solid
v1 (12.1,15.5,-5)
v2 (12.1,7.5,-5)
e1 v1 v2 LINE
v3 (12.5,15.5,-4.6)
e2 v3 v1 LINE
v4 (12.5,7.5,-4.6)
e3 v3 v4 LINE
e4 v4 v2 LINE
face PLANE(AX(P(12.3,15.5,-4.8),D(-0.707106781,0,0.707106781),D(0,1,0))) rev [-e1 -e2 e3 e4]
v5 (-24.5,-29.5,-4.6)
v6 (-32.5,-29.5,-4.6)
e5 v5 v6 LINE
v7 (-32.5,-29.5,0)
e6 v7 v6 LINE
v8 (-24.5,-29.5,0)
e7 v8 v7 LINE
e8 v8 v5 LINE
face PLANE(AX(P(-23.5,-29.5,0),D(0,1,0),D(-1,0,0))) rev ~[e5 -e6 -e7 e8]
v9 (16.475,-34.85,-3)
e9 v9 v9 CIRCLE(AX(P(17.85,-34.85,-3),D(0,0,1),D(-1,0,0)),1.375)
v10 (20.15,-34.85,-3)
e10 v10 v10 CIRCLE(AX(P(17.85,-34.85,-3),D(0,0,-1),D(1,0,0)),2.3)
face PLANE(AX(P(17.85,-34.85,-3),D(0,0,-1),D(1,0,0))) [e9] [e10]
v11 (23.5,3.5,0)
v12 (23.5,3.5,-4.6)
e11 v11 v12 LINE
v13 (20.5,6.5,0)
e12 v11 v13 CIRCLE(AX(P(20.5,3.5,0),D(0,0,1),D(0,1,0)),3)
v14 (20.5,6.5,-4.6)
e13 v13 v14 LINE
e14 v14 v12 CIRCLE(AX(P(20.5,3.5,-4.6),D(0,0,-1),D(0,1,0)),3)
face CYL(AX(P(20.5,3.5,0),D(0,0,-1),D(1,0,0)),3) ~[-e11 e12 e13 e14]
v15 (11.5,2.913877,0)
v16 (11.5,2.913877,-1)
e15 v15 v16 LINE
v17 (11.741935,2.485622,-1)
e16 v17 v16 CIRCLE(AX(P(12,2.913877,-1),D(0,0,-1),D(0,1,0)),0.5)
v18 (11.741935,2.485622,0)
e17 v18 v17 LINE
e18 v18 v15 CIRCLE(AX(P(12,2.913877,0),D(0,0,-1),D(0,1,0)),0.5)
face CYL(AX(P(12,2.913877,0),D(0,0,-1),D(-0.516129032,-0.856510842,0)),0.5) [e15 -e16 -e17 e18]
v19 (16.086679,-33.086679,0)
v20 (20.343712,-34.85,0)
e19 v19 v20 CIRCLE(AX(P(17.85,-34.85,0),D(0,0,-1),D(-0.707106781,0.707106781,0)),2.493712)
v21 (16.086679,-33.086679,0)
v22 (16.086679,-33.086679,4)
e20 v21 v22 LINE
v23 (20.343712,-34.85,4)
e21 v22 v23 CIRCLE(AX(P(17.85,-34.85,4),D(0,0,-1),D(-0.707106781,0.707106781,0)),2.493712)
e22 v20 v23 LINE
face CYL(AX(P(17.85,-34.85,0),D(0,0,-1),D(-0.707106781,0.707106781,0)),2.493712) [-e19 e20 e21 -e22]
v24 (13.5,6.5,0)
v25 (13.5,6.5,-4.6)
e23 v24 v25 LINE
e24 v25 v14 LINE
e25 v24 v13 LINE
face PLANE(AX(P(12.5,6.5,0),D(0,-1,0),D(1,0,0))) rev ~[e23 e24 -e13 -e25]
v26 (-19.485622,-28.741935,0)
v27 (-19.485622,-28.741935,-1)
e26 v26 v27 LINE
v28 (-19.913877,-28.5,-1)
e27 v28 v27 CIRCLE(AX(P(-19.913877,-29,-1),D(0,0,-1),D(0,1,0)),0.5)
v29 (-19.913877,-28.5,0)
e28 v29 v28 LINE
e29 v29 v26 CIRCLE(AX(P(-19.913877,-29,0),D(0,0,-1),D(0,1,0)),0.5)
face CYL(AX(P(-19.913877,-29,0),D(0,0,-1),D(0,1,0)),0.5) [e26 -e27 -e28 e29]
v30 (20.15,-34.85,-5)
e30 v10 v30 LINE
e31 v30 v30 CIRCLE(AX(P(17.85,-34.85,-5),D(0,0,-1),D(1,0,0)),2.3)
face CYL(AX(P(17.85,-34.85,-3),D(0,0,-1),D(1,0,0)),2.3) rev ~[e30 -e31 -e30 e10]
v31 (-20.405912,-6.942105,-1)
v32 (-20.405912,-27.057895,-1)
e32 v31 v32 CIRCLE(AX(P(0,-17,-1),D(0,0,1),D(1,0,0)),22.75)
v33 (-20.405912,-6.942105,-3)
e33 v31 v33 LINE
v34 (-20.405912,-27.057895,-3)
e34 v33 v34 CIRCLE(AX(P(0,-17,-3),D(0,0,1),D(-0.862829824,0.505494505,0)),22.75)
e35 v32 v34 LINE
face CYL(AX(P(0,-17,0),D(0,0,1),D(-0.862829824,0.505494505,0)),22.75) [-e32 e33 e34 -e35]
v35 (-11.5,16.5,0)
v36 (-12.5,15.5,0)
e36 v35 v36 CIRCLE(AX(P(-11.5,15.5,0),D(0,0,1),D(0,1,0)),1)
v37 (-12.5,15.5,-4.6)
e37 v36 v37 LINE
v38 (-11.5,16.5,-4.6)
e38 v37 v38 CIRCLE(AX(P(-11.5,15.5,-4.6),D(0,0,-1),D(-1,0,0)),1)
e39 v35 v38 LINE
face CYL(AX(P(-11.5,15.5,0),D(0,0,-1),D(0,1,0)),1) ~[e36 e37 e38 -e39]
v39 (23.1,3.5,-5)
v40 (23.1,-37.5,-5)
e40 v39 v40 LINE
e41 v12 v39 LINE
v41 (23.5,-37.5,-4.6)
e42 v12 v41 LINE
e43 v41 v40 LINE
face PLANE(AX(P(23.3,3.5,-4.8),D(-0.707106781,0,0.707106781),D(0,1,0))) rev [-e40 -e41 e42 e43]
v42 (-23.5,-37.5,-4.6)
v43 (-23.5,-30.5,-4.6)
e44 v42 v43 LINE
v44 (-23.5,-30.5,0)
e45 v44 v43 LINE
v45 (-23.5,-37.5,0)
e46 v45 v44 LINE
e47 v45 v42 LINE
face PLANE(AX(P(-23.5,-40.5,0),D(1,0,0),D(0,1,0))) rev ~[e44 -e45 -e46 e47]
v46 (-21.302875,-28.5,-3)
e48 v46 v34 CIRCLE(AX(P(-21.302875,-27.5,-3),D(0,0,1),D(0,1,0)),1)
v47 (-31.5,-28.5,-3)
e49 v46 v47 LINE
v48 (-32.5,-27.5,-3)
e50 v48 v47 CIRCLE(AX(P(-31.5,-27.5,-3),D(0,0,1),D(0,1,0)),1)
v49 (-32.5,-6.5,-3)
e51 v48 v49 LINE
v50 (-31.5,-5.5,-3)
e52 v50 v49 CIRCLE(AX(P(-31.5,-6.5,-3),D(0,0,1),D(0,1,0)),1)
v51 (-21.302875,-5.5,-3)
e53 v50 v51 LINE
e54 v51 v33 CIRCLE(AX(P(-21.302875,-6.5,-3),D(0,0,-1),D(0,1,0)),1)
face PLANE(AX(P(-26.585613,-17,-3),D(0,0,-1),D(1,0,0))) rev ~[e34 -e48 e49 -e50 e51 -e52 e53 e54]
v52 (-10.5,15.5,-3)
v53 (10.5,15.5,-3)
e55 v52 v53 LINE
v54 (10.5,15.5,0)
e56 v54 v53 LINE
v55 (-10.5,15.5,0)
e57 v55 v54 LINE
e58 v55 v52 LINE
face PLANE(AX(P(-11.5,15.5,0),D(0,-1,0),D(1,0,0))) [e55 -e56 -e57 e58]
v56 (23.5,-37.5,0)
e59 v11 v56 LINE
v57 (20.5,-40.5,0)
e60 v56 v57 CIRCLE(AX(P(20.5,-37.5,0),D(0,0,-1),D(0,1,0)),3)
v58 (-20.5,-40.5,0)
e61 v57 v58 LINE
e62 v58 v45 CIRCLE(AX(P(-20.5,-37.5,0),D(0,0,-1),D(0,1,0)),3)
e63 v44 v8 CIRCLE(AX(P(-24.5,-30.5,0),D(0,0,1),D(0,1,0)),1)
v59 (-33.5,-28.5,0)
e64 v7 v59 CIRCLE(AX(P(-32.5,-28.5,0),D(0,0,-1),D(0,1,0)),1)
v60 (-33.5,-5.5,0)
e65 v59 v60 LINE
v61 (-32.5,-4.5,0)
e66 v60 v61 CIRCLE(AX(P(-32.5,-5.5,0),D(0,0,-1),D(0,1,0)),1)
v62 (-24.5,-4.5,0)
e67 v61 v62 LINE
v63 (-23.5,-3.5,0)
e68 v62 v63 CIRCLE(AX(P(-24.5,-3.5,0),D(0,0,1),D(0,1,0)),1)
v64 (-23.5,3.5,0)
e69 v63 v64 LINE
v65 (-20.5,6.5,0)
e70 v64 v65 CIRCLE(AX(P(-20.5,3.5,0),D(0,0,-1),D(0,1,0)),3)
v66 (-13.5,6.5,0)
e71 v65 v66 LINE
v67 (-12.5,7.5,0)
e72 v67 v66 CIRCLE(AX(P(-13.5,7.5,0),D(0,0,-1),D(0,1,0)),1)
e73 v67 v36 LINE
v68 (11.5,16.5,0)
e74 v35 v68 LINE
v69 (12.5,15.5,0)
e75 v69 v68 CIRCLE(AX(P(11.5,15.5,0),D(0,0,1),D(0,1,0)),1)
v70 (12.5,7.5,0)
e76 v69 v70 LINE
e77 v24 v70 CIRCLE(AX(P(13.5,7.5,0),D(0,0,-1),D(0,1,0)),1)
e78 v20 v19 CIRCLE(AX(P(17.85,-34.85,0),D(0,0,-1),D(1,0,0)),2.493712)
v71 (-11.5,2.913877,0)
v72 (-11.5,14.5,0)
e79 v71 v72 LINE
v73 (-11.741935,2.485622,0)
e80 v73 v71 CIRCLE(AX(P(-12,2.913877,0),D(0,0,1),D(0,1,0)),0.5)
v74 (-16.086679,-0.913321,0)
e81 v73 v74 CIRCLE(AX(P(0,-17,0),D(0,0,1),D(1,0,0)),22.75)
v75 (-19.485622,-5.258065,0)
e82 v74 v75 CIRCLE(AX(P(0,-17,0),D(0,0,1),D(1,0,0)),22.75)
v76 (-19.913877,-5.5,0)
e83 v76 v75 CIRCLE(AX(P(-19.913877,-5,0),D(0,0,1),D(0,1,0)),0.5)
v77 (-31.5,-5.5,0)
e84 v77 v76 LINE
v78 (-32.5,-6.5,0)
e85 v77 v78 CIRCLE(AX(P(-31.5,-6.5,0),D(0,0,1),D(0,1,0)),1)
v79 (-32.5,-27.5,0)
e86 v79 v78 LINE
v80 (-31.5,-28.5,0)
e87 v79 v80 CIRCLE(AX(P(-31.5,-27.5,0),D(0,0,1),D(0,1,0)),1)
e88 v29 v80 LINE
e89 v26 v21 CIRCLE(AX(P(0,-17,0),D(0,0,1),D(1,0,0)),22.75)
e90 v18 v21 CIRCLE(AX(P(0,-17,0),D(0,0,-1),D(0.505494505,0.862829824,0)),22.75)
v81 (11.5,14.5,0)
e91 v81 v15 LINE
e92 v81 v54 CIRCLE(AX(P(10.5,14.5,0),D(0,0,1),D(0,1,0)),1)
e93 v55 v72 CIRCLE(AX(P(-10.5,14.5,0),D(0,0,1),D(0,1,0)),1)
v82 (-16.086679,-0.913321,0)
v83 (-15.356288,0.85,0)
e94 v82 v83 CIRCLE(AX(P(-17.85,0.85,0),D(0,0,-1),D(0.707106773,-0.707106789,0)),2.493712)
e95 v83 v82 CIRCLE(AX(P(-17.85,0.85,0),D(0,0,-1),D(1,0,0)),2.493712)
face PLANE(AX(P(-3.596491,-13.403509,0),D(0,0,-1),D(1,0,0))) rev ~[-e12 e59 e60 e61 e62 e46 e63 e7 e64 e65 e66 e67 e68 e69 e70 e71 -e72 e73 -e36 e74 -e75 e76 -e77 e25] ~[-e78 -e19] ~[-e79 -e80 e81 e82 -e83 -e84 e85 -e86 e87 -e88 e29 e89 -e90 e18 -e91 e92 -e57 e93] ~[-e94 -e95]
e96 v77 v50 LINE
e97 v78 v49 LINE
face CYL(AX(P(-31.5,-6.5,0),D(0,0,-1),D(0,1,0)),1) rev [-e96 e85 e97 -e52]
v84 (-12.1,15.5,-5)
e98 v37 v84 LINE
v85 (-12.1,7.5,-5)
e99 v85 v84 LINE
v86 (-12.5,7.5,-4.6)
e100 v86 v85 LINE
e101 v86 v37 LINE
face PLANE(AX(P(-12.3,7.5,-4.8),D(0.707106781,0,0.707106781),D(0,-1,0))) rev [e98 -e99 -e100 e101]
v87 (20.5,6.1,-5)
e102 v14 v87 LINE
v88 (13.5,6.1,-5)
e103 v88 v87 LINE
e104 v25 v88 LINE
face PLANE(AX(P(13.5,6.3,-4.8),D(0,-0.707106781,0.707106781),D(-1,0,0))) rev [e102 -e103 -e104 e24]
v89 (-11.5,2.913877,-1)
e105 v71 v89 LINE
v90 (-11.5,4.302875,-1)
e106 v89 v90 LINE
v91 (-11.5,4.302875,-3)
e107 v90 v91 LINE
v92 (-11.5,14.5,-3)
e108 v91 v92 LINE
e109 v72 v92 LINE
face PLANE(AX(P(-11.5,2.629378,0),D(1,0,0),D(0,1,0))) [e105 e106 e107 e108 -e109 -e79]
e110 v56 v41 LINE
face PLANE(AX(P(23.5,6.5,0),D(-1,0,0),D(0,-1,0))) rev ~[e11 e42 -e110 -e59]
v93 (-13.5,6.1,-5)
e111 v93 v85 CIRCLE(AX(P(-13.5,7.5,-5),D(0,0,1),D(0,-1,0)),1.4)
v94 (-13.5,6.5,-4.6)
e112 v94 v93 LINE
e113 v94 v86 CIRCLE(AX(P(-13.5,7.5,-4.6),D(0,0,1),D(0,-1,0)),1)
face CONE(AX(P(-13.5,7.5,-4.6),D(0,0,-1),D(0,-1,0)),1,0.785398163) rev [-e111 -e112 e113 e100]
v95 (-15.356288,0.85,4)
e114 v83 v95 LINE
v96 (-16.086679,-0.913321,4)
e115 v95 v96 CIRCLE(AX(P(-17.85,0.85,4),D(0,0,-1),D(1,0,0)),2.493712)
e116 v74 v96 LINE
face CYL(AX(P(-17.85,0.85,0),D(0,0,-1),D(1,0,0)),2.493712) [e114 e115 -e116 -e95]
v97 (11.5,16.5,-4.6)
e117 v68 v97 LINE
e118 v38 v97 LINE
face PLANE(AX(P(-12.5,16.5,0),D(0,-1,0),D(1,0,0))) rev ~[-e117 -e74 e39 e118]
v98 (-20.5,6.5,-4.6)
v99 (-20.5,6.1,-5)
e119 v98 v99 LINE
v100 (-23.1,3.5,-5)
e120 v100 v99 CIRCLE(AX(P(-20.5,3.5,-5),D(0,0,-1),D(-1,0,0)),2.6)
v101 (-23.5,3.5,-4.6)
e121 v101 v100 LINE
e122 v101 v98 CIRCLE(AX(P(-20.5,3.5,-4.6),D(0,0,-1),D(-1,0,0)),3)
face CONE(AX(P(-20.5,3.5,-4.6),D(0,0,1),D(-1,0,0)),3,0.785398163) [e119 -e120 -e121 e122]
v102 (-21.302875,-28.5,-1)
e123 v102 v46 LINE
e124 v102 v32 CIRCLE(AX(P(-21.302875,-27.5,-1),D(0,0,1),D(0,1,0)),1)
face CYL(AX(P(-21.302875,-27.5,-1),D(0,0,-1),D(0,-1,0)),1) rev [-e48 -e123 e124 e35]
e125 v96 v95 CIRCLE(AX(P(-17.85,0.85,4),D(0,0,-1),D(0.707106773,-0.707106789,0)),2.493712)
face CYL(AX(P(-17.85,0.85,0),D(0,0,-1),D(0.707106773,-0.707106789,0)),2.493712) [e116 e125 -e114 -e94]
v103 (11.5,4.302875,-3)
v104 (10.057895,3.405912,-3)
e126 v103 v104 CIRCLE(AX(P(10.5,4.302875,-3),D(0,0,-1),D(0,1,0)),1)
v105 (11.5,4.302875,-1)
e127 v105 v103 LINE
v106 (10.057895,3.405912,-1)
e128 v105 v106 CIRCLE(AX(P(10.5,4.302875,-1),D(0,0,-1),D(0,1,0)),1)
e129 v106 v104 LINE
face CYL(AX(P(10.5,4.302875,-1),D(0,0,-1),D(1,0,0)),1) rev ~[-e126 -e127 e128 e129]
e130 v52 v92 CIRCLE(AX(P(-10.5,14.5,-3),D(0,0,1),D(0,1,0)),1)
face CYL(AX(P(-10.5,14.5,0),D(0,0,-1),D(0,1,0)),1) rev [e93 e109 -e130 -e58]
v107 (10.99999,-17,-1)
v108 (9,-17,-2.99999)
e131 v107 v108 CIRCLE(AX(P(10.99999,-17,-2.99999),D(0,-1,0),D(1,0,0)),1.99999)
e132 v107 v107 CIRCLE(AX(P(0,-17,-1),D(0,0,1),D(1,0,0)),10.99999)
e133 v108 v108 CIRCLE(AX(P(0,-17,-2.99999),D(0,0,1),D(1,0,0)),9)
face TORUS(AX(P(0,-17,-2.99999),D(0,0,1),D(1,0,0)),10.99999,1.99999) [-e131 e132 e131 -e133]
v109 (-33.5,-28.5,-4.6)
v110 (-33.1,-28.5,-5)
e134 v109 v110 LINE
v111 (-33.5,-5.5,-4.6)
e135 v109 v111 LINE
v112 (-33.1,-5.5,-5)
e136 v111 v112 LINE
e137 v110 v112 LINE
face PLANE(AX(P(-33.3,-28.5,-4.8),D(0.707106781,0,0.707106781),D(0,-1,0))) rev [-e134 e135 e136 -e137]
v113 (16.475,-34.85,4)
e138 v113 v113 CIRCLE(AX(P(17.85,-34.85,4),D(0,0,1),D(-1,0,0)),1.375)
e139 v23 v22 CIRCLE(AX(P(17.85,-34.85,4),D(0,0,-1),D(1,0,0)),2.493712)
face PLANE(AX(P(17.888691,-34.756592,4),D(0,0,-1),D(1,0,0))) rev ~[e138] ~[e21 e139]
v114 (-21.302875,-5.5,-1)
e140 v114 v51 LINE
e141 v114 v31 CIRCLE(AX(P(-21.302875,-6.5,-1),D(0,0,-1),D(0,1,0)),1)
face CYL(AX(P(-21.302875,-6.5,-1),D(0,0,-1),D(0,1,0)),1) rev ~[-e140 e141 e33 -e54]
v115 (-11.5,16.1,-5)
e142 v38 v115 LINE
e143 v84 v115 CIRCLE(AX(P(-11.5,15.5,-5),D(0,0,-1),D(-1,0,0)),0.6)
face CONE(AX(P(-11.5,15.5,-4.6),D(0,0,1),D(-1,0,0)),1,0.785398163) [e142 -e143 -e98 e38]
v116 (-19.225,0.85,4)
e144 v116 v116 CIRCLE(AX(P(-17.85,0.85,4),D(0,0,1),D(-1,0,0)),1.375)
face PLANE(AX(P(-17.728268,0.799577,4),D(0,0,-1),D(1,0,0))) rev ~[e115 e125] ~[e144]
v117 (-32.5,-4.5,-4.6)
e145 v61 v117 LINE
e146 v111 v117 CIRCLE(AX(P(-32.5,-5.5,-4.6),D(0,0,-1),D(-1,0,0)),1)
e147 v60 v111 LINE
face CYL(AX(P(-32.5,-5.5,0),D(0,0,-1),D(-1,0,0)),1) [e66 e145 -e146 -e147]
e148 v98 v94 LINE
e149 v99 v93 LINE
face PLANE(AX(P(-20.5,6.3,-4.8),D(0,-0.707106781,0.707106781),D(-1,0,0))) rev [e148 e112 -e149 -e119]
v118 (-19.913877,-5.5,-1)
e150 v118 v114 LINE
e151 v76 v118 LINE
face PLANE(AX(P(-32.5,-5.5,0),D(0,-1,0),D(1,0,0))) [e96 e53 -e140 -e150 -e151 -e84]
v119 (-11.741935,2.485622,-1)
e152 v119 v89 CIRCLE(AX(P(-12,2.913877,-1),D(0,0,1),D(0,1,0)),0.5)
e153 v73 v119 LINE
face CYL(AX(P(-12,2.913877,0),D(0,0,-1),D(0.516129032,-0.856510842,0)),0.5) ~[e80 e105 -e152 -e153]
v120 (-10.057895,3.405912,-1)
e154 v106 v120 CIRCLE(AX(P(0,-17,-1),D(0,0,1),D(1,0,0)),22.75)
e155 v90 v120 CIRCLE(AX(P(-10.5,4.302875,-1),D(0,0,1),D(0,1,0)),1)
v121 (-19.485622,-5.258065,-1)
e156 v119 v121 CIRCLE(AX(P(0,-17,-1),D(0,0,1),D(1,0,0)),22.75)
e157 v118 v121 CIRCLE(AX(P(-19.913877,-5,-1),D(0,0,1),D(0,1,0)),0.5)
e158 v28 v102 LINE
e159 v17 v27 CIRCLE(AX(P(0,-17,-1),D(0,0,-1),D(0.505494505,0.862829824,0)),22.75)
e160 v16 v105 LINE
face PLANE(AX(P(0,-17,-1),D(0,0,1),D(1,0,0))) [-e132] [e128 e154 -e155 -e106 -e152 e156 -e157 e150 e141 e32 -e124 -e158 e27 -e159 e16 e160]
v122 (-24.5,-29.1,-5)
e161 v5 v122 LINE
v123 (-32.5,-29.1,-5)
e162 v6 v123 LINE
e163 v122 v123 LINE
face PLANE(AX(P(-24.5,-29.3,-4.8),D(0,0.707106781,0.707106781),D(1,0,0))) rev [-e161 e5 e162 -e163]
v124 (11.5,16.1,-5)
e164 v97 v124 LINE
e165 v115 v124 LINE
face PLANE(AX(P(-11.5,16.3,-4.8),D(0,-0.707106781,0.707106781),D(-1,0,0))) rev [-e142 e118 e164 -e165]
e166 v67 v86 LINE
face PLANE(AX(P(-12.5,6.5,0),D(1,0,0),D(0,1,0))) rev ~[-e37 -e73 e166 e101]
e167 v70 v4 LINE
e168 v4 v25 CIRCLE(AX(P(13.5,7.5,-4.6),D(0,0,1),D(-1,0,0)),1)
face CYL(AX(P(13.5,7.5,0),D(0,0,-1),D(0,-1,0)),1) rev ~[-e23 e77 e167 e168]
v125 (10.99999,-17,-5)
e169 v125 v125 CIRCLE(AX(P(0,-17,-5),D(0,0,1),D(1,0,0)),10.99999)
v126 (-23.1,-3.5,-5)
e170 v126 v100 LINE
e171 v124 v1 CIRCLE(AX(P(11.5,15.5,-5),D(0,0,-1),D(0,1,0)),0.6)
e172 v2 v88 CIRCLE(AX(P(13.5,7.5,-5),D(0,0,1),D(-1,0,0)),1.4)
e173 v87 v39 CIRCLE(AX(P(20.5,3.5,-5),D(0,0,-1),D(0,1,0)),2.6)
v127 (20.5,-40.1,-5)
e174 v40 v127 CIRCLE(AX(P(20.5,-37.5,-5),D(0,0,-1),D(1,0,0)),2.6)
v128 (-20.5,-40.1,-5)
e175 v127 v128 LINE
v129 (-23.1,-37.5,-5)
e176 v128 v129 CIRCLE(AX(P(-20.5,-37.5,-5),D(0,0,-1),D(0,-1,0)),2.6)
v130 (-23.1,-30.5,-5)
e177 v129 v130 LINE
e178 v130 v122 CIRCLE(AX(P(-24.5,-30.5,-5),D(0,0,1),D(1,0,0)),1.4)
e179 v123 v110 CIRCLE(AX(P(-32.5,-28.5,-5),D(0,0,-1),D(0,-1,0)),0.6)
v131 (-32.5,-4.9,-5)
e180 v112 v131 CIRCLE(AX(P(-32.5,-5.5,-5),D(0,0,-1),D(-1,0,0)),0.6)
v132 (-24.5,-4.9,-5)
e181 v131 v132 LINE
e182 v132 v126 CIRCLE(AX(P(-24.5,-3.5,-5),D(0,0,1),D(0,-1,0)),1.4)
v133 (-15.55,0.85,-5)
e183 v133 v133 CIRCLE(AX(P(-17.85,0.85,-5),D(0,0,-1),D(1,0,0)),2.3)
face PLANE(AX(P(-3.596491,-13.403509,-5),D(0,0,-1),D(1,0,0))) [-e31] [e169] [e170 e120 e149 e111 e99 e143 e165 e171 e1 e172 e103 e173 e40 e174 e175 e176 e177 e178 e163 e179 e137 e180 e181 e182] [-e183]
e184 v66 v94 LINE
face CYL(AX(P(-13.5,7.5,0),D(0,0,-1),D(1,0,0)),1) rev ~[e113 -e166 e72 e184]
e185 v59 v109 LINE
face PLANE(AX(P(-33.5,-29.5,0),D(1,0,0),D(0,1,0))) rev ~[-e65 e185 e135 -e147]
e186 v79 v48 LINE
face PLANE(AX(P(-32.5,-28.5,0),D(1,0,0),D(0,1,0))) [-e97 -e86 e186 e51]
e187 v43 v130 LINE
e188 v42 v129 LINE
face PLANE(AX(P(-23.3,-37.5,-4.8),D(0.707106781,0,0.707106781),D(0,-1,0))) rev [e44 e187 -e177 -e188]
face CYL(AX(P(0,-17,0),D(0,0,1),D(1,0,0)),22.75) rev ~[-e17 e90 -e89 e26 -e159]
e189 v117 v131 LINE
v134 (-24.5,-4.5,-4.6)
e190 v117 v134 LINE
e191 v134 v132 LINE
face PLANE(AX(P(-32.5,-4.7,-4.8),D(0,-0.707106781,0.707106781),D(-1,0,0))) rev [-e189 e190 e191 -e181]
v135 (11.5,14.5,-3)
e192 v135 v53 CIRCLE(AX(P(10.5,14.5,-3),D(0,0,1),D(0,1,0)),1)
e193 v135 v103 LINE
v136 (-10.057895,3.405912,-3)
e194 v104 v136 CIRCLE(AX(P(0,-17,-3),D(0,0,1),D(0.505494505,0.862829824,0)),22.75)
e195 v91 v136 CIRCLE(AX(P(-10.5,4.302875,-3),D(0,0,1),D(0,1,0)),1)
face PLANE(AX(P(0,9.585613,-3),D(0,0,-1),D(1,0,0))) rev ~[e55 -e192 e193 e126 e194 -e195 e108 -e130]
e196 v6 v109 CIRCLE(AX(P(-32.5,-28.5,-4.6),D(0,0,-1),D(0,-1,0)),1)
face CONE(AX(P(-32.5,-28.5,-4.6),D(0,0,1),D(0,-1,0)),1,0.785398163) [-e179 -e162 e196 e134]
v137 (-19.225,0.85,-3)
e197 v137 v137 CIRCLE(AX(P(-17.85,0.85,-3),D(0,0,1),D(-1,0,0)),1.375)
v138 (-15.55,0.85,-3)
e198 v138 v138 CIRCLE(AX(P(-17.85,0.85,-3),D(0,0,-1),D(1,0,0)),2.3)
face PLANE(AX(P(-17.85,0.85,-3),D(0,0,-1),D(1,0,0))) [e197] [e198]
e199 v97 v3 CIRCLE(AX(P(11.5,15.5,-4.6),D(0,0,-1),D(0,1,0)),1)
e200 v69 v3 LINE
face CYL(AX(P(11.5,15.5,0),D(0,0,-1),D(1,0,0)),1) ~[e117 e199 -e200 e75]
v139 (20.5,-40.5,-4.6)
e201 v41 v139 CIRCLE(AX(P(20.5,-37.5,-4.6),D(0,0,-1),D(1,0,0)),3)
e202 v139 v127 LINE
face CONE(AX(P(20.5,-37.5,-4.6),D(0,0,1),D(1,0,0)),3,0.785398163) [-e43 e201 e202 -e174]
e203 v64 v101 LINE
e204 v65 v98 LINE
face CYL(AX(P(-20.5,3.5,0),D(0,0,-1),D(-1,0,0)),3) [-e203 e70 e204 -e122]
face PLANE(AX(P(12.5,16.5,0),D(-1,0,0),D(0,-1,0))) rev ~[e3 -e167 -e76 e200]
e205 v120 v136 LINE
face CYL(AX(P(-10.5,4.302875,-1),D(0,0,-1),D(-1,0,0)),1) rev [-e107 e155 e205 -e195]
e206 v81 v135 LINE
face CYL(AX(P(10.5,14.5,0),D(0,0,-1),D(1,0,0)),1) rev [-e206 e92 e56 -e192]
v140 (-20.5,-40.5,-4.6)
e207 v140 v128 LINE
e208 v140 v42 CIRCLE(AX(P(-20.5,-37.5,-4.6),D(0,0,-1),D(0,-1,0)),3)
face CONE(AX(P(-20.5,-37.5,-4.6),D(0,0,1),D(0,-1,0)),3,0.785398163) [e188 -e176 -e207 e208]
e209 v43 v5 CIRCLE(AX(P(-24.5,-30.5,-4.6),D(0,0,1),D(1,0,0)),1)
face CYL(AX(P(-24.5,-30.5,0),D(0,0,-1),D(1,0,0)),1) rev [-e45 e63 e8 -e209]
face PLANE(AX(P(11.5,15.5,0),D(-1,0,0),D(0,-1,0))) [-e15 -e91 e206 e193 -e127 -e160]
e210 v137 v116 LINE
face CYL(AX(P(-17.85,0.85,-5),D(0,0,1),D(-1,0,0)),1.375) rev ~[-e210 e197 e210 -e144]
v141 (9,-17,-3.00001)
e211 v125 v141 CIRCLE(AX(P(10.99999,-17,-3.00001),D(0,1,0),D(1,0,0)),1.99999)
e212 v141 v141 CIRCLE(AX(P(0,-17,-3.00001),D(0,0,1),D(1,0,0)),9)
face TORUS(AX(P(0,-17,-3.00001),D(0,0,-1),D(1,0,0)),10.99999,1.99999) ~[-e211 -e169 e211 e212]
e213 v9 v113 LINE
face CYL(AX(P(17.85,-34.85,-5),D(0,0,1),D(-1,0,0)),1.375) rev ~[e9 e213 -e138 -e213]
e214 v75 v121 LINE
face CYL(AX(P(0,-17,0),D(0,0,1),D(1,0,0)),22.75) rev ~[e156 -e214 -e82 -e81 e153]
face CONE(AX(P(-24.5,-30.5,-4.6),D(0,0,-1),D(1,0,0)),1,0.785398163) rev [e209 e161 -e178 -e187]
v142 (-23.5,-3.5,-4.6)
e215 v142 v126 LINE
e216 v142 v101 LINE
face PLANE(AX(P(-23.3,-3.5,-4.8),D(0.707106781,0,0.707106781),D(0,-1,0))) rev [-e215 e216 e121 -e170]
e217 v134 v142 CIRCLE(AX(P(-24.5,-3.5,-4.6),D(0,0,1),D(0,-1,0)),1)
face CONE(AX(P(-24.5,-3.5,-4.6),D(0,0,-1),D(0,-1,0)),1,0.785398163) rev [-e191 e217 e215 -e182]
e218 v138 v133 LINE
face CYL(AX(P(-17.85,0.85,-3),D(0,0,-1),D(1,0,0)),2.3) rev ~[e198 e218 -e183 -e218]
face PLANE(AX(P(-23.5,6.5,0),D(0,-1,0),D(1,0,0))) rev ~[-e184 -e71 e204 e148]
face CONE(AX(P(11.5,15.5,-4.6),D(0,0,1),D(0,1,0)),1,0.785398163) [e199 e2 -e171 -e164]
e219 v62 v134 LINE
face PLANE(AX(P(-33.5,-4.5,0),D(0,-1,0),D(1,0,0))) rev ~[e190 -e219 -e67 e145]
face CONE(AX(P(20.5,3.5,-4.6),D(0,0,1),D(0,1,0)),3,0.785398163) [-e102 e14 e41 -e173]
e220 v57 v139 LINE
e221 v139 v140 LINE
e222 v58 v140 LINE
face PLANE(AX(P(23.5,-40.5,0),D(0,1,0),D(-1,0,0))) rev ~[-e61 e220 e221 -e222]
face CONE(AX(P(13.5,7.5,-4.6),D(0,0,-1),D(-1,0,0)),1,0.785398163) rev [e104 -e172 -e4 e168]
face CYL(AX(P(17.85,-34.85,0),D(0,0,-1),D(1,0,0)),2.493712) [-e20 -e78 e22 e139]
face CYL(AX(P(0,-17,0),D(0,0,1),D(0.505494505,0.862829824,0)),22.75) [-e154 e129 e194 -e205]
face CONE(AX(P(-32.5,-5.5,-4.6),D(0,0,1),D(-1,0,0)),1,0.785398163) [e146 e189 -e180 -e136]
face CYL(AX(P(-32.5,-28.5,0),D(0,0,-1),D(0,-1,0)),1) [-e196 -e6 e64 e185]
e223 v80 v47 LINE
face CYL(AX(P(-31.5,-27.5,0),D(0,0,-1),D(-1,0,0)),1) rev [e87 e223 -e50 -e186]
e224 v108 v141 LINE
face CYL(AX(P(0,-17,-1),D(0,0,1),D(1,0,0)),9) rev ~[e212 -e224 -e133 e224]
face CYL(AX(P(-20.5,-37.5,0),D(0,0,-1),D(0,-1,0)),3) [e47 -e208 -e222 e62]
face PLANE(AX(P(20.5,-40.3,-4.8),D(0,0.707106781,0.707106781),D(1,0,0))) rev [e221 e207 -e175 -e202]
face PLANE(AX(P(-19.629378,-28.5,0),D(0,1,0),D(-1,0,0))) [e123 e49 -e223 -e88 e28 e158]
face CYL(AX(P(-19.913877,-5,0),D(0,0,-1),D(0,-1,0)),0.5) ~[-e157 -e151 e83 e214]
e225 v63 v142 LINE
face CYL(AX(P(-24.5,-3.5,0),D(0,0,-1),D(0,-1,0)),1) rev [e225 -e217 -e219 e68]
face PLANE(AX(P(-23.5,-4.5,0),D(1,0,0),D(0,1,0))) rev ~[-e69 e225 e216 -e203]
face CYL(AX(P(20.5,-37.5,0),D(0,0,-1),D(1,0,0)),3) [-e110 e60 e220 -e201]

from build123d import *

# Parameters (mm, degrees)
F1_DEPTH        = 5
F2_R            = 22.75
F3_DEPTH        = 1
F5_DEPTH        = 4
F6_DEPTH        = 3
F7_R            = 9
F8_DEPTH        = 4.001
F9_R            = 3
F10_R           = 1
F11_R           = 0.5
F13_D           = 2.75
F13_CBORE_D     = 4.6
F13_CBORE_DEPTH = 2
F14_R           = 1.99999
F15_SIZE        = 0.4
F16_ANGLE       = 180


# Not quite as in the source:
# - a fillet or chamfer is up to 0.001 mm smaller than in the source, because OpenCascade refuses the exact size


with BuildPart() as f1:
    # F0 (on Top) → F1 (new body)
    with BuildSketch(Plane.XY):
        Polygon((23.5, -23.5), (23.5, 23.5), (-23.5, 23.5), (-23.5, 12.5), (-33.5, 12.5), (-33.5, -12.5), (-23.5, -12.5), (-23.5, -23.5), (-12.5, -23.5), (-12.5, -33.5), (12.5, -33.5), (12.5, -23.5), align=None)
    extrude(amount=F1_DEPTH)

    # F2 (on face) → F3 (cut)
    with BuildSketch(Plane(origin=(0, 0, 0), x_dir=(1, 0, 0), z_dir=(0, 0, -1))):
        Circle(F2_R)
    extrude(amount=-F3_DEPTH, mode=Mode.SUBTRACT)

    # F4 (on face) → F5 (join)
    with BuildSketch(Plane.XY):
        with BuildLine():
            ThreePointArc((-16.086679292, -16.086679252), (-20.153889553, -18.8043023144), (-15.3562879116, -17.85))
            ThreePointArc((-15.3562879116, -17.85), (-15.546110447, -16.8956976856), (-16.086679292, -16.086679252))
        make_face()
        with BuildLine():
            ThreePointArc((20.3437120884, 17.85), (16.8956976987, 20.1538895584), (16.086679272, 16.086679272))
            ThreePointArc((16.086679272, 16.086679272), (18.8043023013, 15.5461104416), (20.3437120884, 17.85))
        make_face()
    extrude(amount=-F5_DEPTH)

    # F4 (on face) → F6 (cut)
    with BuildSketch(Plane.XY):
        with BuildLine():
            ThreePointArc((11.5, -19.6293784925), (0, -22.75), (-11.5, -19.6293784925))
            Line((-11.5, -19.6293784925), (-11.5, -32.5))
            Line((-11.5, -32.5), (11.5, -32.5))
            Line((11.5, -32.5), (11.5, -19.6293784925))
        make_face()
        with BuildLine():
            Line((-32.5, -11.5), (-19.6293784925, -11.5))
            ThreePointArc((-19.6293784925, -11.5), (-22.75, 0), (-19.6293784925, 11.5))
            Line((-19.6293784925, 11.5), (-32.5, 11.5))
            Line((-32.5, 11.5), (-32.5, -11.5))
        make_face()
    extrude(amount=F6_DEPTH, mode=Mode.SUBTRACT)

    # F7 (on face) → F8 (cut, through all)
    with BuildSketch(Plane(origin=(0, 0, 1), x_dir=(1, 0, 0), z_dir=(0, 0, -1))):
        Circle(F7_R)
    extrude(amount=-F8_DEPTH, mode=Mode.SUBTRACT)

    # F9
    f9_edges = [f1.edges().sort_by_distance(p)[0] for p in [
        (-23.5, 23.5, 2.5),
        (23.5, 23.5, 2.5),
        (23.5, -23.5, 2.5),
        (-23.5, -23.5, 2.5),
    ]]
    fillet(f9_edges, radius=F9_R)

    # F10
    f10_edges = [f1.edges().sort_by_distance(p)[0] for p in [
        (-32.5, -11.5, 1.5),
        (-33.5, 12.5, 2.5),
        (-32.5, 11.5, 1.5),
        (-33.5, -12.5, 2.5),
        (-12.5, -33.5, 2.5),
        (12.5, -33.5, 2.5),
        (-11.5, -32.5, 1.5),
        (11.5, -32.5, 1.5),
        (-23.5, -12.5, 2.5),
        (-23.5, 12.5, 2.5),
        (-12.5, -23.5, 2.5),
        (12.5, -23.5, 2.5),
        (-19.629378, -11.5, 2),
        (-19.629378, 11.5, 2),
        (11.5, -19.629378, 2),
        (-11.5, -19.629378, 2),
    ]]
    fillet(f10_edges, radius=F10_R)

    # F11
    f11_edges = [f1.edges().sort_by_distance(p)[0] for p in [
        (-19.629378, -11.5, 0.5),
        (-11.5, -19.629378, 0.5),
        (11.5, -19.629378, 0.5),
        (-19.629378, 11.5, 0.5),
    ]]
    fillet(f11_edges, radius=F11_R)

    # F13 (through all)
    with Locations(Plane.XY.offset(5)):
        with Locations((-17.85, -17.85), (17.85, 17.85)):
            CounterBoreHole(F13_D / 2, F13_CBORE_D / 2, F13_CBORE_DEPTH)

    # F14 (radius 2 in the source; OpenCascade refuses exactly that, so slightly less here)
    f14_edges = [f1.edges().sort_by_distance(p)[0] for p in [
        (-9, 0, 5),
        (-9, 0, 1),
    ]]
    fillet(f14_edges, radius=F14_R)

    # F15
    f15_edges = [f1.edges().sort_by_distance(p)[0] for p in [
        (-33.5, 0, 5),
    ]]
    chamfer(f15_edges, length=F15_SIZE)


with BuildPart() as f1_1:
    # F16: moved
    add(f1.part.rotate(Axis((0, -33.5, 0), (-1, 0, 0)), F16_ANGLE))


with BuildPart() as f1_2:
    # F17: moved
    add(f1_1.part.moved(Location((0, 50, 0))))


solid = f1_2.part
